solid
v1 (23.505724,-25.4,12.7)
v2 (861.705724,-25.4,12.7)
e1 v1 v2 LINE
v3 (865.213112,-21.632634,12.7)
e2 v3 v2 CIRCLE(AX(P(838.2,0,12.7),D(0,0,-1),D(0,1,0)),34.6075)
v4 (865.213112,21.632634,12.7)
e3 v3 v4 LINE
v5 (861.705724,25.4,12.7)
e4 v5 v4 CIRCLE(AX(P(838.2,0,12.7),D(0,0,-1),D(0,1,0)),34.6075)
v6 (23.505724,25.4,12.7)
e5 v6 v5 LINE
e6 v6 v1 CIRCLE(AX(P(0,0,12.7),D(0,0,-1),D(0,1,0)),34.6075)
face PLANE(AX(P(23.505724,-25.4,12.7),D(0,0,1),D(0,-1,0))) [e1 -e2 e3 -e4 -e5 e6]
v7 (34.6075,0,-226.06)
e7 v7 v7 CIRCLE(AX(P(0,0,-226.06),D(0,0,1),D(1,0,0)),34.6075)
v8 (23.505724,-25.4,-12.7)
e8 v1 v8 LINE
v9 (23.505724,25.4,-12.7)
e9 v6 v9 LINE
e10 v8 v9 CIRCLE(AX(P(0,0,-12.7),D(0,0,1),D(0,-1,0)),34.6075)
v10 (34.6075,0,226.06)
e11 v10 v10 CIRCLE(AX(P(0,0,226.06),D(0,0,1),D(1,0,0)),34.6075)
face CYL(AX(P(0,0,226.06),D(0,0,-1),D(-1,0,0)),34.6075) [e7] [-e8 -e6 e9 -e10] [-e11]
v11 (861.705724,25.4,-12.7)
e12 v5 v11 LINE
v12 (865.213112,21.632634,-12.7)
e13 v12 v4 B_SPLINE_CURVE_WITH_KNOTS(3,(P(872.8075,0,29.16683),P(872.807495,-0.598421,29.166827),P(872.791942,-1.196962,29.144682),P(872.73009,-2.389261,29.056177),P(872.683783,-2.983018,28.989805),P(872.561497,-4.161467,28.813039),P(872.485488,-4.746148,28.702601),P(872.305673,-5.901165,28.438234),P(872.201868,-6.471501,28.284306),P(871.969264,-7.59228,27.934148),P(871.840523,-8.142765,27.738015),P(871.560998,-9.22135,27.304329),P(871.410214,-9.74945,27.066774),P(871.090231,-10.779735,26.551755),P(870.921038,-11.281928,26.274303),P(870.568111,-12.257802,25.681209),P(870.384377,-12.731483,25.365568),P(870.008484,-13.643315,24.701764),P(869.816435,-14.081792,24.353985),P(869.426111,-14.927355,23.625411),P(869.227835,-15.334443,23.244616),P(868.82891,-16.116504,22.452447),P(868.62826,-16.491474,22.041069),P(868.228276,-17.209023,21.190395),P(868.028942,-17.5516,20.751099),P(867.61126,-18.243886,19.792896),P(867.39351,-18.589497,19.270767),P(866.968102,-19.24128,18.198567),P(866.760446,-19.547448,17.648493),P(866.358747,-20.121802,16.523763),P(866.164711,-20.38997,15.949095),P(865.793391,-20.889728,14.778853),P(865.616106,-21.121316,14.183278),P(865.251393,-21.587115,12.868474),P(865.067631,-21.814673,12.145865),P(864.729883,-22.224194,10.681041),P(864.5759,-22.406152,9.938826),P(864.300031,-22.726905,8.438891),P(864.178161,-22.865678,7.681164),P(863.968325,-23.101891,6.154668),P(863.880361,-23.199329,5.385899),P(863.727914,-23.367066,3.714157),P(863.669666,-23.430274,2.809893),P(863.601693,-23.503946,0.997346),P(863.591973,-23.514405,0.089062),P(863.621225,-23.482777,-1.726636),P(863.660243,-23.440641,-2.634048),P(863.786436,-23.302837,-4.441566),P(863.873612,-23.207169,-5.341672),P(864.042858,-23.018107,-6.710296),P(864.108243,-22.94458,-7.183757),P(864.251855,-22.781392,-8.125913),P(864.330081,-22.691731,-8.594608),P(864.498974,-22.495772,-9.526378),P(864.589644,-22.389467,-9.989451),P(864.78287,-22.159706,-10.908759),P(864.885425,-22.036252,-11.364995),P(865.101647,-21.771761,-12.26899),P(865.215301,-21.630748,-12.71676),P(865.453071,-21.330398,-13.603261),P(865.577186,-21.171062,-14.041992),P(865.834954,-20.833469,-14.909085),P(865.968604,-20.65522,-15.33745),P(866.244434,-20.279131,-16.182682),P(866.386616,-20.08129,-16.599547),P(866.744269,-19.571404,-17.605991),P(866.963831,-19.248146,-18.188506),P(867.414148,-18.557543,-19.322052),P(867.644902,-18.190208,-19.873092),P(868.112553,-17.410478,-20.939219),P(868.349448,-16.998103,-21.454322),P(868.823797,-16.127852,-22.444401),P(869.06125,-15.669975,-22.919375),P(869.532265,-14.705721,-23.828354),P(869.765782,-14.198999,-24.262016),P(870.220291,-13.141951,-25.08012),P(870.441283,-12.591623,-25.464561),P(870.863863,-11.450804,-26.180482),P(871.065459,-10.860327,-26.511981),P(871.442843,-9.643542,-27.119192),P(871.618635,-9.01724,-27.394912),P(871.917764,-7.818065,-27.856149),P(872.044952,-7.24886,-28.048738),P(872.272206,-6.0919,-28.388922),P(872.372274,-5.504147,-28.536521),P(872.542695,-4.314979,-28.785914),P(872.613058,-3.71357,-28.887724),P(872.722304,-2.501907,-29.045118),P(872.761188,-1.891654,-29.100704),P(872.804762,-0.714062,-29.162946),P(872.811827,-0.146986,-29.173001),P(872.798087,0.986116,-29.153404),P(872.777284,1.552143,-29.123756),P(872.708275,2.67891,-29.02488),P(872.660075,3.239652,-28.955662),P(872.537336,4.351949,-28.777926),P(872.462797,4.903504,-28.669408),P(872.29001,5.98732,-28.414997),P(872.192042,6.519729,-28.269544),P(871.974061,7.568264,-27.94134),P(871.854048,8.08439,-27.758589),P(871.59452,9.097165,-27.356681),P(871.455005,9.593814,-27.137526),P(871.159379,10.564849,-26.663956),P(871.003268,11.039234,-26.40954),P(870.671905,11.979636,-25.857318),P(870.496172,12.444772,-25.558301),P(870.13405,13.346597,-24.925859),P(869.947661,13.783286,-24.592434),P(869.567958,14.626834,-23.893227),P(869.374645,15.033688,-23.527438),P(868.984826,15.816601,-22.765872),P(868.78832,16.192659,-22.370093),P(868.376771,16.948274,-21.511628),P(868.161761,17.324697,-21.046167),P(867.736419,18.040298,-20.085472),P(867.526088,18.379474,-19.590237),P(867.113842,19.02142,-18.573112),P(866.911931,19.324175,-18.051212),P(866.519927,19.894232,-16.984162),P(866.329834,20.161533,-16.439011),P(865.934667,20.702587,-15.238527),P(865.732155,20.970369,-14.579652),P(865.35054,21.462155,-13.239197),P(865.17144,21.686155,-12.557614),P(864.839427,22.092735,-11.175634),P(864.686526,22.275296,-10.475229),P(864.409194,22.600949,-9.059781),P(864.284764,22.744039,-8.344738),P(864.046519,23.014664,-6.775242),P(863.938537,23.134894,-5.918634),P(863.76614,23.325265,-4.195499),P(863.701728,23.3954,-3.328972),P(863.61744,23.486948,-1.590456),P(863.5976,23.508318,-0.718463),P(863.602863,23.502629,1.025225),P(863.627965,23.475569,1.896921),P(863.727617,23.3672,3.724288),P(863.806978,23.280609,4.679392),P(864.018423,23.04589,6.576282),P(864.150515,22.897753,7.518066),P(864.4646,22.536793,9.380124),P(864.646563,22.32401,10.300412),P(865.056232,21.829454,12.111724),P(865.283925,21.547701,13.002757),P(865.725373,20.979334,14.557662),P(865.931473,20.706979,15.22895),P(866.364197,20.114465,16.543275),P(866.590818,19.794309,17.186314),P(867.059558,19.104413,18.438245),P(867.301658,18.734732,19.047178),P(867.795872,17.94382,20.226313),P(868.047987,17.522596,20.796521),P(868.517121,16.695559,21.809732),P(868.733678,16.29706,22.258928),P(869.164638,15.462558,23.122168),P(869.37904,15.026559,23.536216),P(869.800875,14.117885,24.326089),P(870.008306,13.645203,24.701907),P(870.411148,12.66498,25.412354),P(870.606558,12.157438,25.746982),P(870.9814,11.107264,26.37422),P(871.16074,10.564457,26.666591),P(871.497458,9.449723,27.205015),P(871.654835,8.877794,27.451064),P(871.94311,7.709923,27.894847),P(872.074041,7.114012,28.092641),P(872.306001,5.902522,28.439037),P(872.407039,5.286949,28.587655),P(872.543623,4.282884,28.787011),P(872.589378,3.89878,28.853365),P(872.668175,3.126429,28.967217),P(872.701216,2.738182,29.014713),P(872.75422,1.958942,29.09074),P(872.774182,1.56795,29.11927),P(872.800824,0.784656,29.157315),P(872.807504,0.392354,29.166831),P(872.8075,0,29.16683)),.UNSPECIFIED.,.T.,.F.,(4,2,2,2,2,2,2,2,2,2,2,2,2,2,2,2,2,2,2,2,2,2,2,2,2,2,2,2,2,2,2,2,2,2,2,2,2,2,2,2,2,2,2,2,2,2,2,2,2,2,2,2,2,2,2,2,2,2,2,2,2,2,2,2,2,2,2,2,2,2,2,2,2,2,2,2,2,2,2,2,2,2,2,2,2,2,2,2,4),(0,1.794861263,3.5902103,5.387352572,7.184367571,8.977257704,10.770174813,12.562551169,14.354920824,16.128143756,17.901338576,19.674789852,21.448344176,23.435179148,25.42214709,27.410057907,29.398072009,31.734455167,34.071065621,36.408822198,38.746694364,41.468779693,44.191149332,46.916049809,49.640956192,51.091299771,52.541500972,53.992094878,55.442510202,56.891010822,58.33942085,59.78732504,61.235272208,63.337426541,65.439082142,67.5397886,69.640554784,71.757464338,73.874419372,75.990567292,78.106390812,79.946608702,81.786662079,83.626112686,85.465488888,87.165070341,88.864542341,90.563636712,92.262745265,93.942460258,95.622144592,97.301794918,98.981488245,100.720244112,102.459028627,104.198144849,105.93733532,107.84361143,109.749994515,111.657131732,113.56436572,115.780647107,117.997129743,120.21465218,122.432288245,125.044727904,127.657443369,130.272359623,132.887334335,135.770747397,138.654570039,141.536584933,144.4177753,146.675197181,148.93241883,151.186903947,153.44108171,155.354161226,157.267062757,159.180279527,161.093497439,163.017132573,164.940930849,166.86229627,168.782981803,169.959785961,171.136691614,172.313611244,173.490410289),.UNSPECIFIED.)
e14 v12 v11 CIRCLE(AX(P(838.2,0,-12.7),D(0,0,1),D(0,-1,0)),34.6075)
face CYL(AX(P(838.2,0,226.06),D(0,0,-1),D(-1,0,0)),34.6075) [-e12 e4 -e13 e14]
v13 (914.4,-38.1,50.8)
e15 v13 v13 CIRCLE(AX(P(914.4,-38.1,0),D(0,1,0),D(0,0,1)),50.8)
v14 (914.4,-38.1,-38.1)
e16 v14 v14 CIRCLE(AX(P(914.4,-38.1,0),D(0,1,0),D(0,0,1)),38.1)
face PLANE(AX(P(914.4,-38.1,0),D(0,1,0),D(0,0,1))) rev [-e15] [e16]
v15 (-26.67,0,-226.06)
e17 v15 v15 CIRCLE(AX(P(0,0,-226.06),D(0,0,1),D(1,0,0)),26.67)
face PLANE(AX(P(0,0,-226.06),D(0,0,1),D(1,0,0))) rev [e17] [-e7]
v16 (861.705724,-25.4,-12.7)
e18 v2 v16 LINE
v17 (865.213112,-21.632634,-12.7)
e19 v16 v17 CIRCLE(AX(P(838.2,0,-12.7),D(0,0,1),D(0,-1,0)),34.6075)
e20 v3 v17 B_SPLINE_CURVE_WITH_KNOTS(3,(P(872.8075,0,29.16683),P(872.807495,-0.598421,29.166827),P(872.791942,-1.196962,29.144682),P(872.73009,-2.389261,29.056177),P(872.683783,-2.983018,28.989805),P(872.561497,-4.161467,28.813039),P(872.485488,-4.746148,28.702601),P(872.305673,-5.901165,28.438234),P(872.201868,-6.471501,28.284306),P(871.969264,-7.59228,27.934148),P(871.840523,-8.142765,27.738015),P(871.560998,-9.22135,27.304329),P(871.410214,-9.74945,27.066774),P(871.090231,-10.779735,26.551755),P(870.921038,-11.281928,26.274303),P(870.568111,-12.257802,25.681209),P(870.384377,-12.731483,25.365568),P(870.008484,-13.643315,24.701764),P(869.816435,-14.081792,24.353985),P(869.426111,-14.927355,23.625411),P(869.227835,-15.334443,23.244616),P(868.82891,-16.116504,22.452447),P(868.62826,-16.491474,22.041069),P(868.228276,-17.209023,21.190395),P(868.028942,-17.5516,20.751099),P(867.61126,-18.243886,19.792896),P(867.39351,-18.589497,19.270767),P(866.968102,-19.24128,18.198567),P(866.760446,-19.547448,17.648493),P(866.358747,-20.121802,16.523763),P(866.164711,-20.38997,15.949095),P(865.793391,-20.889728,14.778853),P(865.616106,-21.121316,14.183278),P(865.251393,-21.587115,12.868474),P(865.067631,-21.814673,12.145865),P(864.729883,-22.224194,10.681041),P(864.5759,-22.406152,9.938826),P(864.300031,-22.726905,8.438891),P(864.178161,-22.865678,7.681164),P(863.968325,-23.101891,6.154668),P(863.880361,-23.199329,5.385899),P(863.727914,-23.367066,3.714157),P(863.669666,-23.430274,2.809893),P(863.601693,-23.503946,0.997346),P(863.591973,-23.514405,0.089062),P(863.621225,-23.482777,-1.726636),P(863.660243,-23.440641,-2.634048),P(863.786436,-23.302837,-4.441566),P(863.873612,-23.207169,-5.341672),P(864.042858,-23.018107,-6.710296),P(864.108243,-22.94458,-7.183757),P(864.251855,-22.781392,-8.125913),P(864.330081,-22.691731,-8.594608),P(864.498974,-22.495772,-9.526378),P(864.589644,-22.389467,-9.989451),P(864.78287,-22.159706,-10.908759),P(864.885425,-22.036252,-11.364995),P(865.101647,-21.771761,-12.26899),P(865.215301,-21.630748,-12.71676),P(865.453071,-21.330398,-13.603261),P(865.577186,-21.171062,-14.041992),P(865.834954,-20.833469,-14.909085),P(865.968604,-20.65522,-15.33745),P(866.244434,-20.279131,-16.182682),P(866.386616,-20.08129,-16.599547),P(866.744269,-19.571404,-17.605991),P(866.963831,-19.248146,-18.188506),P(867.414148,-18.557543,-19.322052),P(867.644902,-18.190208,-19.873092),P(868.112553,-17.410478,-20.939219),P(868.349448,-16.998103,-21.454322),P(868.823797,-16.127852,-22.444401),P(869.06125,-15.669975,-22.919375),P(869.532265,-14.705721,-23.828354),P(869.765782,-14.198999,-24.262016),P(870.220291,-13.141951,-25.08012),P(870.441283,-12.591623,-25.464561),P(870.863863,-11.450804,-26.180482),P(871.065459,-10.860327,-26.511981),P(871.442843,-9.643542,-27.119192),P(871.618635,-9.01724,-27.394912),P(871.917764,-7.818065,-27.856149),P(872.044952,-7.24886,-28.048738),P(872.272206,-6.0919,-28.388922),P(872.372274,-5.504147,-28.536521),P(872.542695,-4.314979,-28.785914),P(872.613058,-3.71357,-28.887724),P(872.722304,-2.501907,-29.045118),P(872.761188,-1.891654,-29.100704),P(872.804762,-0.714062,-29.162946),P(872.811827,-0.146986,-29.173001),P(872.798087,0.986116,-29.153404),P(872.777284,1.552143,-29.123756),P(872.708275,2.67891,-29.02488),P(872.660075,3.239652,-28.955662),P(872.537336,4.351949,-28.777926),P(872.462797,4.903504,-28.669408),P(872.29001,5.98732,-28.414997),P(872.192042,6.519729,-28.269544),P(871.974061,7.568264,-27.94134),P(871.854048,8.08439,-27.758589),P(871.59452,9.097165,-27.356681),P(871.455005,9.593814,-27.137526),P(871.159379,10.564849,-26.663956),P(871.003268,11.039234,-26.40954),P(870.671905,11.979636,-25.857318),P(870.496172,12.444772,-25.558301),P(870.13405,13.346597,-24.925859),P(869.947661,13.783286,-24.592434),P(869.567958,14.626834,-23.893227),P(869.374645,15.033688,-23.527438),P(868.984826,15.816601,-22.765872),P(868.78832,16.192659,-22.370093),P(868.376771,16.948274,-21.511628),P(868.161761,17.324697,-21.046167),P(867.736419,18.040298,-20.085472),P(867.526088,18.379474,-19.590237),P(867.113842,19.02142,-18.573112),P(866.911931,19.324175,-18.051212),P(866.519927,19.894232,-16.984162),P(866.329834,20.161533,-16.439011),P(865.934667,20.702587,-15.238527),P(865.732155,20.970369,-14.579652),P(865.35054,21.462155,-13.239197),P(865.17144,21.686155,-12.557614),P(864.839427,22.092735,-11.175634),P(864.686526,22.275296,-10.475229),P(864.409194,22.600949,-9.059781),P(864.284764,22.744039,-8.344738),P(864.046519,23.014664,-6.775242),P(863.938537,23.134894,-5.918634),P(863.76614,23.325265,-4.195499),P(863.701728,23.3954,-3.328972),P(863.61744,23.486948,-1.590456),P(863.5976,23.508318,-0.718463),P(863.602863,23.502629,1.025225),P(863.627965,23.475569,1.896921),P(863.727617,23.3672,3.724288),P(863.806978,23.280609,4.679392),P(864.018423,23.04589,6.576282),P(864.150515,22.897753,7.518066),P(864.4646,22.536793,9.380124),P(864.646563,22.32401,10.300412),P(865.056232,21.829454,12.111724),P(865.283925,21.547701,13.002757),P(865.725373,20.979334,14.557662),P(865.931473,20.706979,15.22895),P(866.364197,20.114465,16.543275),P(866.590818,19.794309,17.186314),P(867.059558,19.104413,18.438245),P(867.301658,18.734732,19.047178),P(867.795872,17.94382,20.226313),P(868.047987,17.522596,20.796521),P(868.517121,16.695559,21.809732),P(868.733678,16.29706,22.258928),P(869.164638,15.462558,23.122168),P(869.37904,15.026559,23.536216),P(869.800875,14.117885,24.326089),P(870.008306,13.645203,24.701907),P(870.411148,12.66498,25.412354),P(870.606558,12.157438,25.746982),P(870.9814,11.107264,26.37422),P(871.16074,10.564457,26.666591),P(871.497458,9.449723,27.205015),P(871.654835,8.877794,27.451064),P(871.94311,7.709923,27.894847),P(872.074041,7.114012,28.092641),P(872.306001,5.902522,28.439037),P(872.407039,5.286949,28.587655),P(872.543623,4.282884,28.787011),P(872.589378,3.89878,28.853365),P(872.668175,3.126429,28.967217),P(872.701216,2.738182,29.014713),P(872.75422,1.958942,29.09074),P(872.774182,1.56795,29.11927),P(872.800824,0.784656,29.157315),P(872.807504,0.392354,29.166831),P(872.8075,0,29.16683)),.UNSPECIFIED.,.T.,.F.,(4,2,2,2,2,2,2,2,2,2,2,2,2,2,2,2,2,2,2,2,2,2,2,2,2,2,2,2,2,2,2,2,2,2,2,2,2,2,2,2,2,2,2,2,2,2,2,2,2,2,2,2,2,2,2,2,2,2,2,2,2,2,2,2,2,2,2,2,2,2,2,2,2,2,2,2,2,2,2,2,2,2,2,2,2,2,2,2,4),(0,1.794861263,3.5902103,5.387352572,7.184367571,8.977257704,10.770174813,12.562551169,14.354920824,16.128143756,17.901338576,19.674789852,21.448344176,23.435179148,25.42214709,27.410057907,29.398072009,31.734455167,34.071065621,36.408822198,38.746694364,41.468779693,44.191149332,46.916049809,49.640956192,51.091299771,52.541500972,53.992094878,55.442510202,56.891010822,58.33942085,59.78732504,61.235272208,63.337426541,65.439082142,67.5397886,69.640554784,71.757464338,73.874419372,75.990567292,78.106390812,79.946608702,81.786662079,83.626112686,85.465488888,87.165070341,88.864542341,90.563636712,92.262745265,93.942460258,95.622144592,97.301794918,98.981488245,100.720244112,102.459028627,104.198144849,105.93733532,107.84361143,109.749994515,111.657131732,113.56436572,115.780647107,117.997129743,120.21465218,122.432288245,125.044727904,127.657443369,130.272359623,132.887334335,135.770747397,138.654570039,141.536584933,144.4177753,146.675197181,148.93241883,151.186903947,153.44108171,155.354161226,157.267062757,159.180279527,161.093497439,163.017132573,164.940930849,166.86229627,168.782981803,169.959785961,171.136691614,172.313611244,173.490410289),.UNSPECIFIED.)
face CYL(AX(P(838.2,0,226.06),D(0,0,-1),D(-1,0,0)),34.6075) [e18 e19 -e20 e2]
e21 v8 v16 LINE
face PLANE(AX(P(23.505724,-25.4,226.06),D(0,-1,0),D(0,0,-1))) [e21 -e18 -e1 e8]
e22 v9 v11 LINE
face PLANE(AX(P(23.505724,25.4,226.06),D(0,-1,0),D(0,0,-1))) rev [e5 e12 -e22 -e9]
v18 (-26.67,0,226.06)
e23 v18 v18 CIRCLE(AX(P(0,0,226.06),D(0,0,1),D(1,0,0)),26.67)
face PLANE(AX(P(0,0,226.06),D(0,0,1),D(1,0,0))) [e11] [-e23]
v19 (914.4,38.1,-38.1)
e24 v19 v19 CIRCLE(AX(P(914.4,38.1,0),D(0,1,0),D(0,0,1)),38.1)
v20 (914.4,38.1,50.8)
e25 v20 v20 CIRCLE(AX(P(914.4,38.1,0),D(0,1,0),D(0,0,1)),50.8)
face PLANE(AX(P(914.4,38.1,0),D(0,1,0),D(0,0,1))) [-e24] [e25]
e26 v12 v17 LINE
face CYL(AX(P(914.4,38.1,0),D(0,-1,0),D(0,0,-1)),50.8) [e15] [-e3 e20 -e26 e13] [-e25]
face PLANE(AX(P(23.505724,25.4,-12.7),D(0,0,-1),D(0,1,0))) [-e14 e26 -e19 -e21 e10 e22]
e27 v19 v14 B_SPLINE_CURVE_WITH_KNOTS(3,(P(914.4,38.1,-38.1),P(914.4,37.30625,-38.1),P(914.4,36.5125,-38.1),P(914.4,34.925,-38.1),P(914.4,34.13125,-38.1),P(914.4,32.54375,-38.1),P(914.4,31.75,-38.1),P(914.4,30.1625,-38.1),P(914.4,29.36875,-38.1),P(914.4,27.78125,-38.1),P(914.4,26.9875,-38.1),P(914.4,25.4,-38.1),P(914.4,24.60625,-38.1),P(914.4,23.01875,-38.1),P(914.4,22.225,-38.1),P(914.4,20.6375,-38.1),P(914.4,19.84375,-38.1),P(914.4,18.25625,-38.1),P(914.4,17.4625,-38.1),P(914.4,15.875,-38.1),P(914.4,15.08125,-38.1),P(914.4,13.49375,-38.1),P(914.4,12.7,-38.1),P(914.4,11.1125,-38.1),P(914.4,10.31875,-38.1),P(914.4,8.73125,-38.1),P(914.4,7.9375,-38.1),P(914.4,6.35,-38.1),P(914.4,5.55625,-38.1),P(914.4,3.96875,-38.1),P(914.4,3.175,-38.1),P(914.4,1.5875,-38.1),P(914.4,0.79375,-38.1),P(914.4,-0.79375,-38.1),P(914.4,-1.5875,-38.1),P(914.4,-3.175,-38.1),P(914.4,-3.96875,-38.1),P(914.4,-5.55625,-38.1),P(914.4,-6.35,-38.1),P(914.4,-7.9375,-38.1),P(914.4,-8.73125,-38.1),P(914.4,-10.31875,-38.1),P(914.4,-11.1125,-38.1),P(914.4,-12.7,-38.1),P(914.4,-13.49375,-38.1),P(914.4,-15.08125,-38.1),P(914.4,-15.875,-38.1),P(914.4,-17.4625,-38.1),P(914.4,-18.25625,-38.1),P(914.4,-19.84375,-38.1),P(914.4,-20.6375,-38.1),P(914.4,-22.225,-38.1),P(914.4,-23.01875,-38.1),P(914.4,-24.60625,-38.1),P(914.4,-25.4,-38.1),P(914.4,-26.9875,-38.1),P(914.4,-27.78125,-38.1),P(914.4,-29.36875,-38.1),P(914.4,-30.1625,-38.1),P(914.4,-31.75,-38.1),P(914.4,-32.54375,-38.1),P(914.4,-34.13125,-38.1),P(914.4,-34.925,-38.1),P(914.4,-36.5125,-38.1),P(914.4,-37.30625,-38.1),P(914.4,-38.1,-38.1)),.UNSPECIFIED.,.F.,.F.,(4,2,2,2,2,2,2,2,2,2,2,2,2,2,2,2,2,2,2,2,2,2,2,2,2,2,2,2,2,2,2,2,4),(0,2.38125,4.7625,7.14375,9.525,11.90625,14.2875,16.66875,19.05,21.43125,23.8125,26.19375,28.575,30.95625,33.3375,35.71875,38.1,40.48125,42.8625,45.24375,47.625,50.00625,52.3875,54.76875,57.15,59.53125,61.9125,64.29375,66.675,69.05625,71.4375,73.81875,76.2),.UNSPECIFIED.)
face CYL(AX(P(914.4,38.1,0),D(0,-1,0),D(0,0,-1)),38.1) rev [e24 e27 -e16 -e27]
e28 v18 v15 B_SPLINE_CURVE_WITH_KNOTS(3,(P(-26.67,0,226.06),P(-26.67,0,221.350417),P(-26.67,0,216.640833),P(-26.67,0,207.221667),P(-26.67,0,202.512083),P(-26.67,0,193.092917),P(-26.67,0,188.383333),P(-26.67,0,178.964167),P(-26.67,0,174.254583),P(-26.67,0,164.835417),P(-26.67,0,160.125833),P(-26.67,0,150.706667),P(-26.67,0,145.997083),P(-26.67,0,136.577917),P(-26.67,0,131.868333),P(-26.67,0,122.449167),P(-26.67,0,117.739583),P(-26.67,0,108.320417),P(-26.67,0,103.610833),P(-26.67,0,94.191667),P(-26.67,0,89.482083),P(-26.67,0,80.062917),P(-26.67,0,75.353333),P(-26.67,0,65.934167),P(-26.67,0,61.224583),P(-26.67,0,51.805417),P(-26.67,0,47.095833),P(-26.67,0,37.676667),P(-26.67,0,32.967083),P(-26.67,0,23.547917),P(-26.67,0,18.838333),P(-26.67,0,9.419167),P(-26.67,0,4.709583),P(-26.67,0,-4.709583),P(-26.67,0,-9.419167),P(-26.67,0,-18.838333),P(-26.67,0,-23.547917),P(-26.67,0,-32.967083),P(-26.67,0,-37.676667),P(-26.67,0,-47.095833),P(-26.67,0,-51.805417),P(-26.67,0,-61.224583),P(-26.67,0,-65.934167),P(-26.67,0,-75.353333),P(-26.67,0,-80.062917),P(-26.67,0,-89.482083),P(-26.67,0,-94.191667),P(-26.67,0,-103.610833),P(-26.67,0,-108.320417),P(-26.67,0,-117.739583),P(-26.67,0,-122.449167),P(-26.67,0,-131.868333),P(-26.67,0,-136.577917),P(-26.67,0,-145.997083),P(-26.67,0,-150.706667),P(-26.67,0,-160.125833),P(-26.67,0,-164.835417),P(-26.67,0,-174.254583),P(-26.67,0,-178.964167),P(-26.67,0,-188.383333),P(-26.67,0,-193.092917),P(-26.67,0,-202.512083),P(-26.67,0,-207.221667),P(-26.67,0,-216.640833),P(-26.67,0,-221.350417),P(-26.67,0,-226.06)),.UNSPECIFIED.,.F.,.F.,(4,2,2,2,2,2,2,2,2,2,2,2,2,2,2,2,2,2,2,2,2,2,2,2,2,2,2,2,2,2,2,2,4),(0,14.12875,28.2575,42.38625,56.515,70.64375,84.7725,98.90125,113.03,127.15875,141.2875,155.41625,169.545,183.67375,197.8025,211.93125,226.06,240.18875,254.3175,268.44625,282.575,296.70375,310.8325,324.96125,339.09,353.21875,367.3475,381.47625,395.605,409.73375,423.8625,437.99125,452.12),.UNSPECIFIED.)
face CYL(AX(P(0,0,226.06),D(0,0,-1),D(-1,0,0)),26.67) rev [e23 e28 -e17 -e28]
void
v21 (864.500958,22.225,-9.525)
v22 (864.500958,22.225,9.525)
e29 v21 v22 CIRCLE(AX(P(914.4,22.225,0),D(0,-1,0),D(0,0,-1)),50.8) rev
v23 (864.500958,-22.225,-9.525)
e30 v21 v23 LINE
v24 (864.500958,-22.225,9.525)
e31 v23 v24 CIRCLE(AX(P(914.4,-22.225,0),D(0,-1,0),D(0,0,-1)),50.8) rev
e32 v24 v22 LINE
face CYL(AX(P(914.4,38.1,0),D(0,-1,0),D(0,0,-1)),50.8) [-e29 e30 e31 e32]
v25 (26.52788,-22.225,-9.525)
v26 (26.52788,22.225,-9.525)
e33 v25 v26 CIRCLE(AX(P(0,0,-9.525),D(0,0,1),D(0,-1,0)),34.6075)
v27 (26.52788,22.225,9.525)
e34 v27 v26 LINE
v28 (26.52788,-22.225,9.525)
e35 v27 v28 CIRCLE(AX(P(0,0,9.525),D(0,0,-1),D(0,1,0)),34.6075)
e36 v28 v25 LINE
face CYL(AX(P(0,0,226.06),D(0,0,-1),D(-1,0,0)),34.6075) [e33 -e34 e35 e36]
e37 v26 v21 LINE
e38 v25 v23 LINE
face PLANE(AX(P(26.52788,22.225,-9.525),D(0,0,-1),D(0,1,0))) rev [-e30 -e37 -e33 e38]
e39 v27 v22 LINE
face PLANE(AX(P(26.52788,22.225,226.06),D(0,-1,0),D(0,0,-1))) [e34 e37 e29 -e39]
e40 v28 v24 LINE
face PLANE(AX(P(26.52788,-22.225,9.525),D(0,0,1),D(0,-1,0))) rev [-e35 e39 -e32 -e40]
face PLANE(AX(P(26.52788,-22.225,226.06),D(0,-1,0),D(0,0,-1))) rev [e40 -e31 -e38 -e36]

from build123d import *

# Parameters (mm, degrees)
SKETCH1_R             = 34.6075
SKETCH1_R_2           = 26.67
BOSS_EXTRUDE1_DEPTH   = 226.06
BOSS_EXTRUDE2_START   = -12.7
BOSS_EXTRUDE2_DEPTH   = 3.175
BOSS_EXTRUDE2_START_2 = 9.525
BOSS_EXTRUDE2_2_DEPTH = 3.175
BOSS_EXTRUDE2_START_3 = -9.525
BOSS_EXTRUDE2_3_DEPTH = 19.05
SKETCH3_R             = 50.8
SKETCH3_R_2           = 38.1
BOSS_EXTRUDE3_DEPTH   = 38.1


# Read off the part's stored shape, not the designer's step: Boss-Extrude2
with BuildPart() as part:
    # Sketch1 → Boss-Extrude1 (new, symmetric)
    with BuildSketch(Plane.XY):
        with Locations(Location((0, 0, 0), (0, 0, 180))):
            Circle(SKETCH1_R)
        with Locations(Location((0, 0, 0), (0, 0, 180))):
            Circle(SKETCH1_R_2, mode=Mode.SUBTRACT)
    extrude(amount=BOSS_EXTRUDE1_DEPTH, both=True)

    # Boss-Extrude2 outline → Boss-Extrude2 (add)
    with BuildSketch(Plane.XY.offset(BOSS_EXTRUDE2_START)):
        with BuildLine():
            Line((861.705723904, 25.4), (23.505723904, 25.4))
            ThreePointArc((23.505723904, 25.4), (34.6075, 0), (23.505723904, -25.4))
            Line((23.505723904, -25.4), (861.705723904, -25.4))
            ThreePointArc((861.705723904, -25.4), (872.8075, 0), (861.705723904, 25.4))
        make_face()
    extrude(amount=BOSS_EXTRUDE2_DEPTH)

    # Boss-Extrude2 2 outline → Boss-Extrude2 2 (add)
    with BuildSketch(Plane.XY.offset(BOSS_EXTRUDE2_START_2)):
        with BuildLine():
            Line((861.705723904, 25.4), (23.505723904, 25.4))
            ThreePointArc((23.505723904, 25.4), (34.6075, 0), (23.505723904, -25.4))
            Line((23.505723904, -25.4), (861.705723904, -25.4))
            ThreePointArc((861.705723904, -25.4), (872.8075, 0), (861.705723904, 25.4))
        make_face()
    extrude(amount=BOSS_EXTRUDE2_2_DEPTH)

    # Boss-Extrude2 3 outline → Boss-Extrude2 3 (add)
    with BuildSketch(Plane.XY.offset(BOSS_EXTRUDE2_START_3)):
        with BuildLine():
            ThreePointArc((864.727880263, 22.225), (863.267120751, 23.86039634), (861.705723904, 25.4))
            Line((861.705723904, 25.4), (23.505723904, 25.4))
            ThreePointArc((23.505723904, 25.4), (25.067120751, 23.86039634), (26.527880263, 22.225))
            Line((26.527880263, 22.225), (864.727880263, 22.225))
        make_face()
        with BuildLine():
            ThreePointArc((861.705723904, -25.4), (863.267120751, -23.86039634), (864.727880263, -22.225))
            Line((864.727880263, -22.225), (26.527880263, -22.225))
            ThreePointArc((26.527880263, -22.225), (25.067120751, -23.86039634), (23.505723904, -25.4))
            Line((23.505723904, -25.4), (861.705723904, -25.4))
        make_face()
    extrude(amount=BOSS_EXTRUDE2_3_DEPTH)

    # Sketch3 → Boss-Extrude3 (add, symmetric)
    with BuildSketch(Plane(origin=(0, 0, 0), x_dir=(1, 0, 0), z_dir=(0, 1, 0))):
        with Locations(Location((914.4, 0, 0), (0, 0, 270))):
            Circle(SKETCH3_R)
        with Locations(Location((914.4, 0, 0), (0, 0, 90))):
            Circle(SKETCH3_R_2, mode=Mode.SUBTRACT)
    extrude(amount=BOSS_EXTRUDE3_DEPTH, both=True)


solid = part.part
